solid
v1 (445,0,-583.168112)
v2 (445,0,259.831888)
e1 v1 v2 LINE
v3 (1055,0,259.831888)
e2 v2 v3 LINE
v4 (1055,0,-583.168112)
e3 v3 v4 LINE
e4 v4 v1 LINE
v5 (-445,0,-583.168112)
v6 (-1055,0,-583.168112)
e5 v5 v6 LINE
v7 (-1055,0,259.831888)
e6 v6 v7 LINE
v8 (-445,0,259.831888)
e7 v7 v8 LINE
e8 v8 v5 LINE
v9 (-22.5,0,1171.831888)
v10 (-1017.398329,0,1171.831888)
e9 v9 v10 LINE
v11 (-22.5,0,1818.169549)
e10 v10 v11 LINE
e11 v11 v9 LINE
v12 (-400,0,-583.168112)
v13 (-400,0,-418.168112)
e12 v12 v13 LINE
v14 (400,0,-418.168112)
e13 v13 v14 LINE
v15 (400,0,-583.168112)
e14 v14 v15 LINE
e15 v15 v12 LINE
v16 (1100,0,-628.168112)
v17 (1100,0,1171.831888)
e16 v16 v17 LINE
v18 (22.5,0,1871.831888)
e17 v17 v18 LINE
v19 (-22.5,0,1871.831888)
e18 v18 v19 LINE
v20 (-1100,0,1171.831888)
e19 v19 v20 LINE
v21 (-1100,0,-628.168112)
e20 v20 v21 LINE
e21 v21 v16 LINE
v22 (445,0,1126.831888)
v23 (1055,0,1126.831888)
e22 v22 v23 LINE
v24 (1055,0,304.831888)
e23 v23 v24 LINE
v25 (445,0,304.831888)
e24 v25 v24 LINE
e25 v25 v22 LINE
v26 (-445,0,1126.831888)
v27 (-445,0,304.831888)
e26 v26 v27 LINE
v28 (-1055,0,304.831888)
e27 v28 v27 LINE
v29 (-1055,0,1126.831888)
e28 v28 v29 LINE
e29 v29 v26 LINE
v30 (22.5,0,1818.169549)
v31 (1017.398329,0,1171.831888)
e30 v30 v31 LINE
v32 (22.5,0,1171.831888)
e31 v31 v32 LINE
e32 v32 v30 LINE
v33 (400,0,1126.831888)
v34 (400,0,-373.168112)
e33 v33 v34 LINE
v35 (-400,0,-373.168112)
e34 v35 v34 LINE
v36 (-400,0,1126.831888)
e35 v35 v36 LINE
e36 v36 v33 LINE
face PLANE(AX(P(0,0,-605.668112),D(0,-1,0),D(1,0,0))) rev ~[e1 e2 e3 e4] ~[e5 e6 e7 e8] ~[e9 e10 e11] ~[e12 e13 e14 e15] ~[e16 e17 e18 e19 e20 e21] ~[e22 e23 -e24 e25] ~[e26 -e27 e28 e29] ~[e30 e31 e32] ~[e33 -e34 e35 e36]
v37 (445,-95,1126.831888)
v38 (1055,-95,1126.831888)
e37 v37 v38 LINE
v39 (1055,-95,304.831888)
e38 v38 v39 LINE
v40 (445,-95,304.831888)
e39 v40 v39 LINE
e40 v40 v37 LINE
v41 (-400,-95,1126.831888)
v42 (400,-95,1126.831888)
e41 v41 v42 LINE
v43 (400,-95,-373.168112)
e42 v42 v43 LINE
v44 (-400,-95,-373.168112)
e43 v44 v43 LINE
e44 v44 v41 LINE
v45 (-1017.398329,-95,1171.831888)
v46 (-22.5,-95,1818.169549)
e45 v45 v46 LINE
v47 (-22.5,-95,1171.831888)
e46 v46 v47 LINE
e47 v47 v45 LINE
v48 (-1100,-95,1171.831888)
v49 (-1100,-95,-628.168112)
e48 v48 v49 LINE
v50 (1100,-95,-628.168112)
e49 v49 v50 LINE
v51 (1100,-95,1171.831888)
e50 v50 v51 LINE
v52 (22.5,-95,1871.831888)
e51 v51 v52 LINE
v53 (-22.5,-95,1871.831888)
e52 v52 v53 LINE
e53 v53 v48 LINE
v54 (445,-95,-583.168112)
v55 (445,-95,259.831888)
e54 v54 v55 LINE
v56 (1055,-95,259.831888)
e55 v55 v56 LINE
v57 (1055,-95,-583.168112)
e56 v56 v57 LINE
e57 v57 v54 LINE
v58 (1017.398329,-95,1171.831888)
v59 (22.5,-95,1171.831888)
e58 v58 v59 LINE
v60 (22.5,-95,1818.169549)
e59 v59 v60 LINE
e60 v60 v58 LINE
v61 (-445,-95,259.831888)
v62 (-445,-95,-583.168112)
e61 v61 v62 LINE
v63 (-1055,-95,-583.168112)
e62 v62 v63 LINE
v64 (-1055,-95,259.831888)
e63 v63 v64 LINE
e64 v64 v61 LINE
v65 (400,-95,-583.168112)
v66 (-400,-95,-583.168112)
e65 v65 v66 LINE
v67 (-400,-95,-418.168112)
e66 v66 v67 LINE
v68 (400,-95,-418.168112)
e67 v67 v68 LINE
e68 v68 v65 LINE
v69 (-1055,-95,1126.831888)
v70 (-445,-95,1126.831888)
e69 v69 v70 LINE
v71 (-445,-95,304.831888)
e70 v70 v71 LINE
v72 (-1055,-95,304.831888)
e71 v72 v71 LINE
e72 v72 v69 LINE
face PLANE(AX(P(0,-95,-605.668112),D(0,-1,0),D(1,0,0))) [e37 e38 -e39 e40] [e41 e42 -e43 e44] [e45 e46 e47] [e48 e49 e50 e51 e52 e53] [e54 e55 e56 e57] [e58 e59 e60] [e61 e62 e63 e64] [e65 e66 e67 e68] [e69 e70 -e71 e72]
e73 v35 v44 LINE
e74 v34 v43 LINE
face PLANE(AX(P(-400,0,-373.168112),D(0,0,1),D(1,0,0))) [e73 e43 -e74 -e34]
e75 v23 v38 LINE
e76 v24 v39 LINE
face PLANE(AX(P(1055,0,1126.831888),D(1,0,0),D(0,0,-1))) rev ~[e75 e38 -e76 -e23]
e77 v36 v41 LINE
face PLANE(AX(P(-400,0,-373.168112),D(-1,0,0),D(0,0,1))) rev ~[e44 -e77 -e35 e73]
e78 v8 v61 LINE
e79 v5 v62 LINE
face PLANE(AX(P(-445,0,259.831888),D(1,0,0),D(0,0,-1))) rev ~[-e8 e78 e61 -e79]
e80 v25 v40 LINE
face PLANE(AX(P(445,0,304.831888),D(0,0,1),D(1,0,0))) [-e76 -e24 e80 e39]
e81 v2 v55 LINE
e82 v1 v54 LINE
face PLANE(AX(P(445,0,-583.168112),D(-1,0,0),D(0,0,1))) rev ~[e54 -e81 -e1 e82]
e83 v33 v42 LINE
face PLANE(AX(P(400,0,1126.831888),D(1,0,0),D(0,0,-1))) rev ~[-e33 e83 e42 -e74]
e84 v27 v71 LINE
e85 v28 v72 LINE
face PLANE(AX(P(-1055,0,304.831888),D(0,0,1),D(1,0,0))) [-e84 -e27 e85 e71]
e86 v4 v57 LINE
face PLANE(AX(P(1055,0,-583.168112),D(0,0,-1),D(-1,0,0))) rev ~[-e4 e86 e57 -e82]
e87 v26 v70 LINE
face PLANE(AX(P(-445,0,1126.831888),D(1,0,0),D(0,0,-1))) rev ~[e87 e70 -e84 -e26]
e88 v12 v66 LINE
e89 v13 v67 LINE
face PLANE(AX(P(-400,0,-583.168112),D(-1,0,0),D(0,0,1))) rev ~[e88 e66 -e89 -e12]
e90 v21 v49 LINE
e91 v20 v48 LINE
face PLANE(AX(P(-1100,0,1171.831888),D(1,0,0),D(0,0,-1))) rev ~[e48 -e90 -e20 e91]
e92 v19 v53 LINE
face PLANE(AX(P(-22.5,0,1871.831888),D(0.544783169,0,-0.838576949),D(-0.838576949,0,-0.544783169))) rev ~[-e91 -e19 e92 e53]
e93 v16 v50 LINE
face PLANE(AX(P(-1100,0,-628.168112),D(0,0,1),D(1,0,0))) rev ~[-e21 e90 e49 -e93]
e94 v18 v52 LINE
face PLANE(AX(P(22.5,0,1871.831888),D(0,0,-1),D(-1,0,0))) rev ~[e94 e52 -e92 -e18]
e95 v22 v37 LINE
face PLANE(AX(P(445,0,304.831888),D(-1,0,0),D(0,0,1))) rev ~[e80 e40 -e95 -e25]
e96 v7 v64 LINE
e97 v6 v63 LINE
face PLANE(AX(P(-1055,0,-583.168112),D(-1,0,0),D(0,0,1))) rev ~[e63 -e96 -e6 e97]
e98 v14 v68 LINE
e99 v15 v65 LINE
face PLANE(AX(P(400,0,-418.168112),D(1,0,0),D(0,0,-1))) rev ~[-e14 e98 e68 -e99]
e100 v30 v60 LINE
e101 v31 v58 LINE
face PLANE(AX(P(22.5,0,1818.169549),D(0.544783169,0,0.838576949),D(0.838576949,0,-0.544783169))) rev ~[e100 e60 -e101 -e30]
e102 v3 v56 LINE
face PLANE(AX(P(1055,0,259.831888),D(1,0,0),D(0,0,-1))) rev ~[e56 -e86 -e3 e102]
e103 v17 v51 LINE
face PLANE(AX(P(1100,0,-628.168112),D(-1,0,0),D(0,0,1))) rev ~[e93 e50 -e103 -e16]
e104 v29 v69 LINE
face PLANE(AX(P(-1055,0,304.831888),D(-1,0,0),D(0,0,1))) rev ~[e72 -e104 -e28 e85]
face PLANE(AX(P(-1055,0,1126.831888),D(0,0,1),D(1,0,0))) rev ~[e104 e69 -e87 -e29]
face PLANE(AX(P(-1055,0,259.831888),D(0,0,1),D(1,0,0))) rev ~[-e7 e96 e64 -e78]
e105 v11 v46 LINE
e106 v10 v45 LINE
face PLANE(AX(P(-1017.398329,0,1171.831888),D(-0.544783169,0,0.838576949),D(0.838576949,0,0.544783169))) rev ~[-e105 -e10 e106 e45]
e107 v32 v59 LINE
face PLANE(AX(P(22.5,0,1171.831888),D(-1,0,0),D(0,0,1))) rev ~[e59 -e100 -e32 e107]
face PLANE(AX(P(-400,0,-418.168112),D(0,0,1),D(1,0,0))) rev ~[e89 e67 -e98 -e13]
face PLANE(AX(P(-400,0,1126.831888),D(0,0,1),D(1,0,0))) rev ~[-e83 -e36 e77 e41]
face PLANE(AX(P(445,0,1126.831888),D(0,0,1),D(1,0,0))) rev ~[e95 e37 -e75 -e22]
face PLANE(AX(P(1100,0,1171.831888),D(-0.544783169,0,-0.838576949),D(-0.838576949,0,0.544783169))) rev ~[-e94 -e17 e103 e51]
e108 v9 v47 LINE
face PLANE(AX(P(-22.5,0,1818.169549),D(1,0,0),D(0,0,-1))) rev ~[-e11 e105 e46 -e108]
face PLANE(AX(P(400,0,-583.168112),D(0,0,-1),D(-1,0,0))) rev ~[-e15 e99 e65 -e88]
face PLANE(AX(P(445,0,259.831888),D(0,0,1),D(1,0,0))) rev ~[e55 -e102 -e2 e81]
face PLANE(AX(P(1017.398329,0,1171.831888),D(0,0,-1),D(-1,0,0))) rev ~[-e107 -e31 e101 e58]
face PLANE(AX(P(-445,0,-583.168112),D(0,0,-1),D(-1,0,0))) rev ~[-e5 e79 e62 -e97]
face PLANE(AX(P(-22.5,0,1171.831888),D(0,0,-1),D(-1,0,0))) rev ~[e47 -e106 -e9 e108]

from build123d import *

# Parameters (mm, degrees)
F0_W     = 610
F0_H     = 45
F0_W_2   = 800
F1_DEPTH = 95


# Not quite as in the source:
# - a feature names something its author has since deleted; it is built from what else it names


with BuildPart() as f1:
    # F0 (on Front) → F1 (new body)
    with BuildSketch(Plane.XZ):
        Polygon((1100, -628.1681121112), (1100, -583.1681121112), (1055, -583.1681121112), (445, -583.1681121112), (400, -583.1681121112), (-400, -583.1681121112), (-445, -583.1681121112), (-1055, -583.1681121112), (-1100, -583.1681121112), (-1100, -628.1681121112), align=None)
        Polygon((1055, -583.1681121112), (1100, -583.1681121112), (1100, 1126.8318878888), (1055, 1126.8318878888), (1055, 304.8318878888), (1055, 259.8318878888), align=None)
        Polygon((1055, 1126.8318878888), (1100, 1126.8318878888), (1100, 1171.8318878888), (1017.398329114, 1171.8318878888), (22.5, 1171.8318878888), (-22.5, 1171.8318878888), (-1017.398329114, 1171.8318878888), (-1100, 1171.8318878888), (-1100, 1126.8318878888), (-1055, 1126.8318878888), (-445, 1126.8318878888), (-400, 1126.8318878888), (400, 1126.8318878888), (445, 1126.8318878888), align=None)
        Polygon((1017.398329114, 1171.8318878888), (1100, 1171.8318878888), (22.5, 1871.8318878888), (22.5, 1818.1695494942), align=None)
        Polygon((-1100, 1126.8318878888), (-1100, -583.1681121112), (-1055, -583.1681121112), (-1055, 259.8318878888), (-1055, 304.8318878888), (-1055, 1126.8318878888), align=None)
        Polygon((22.5, 1818.1695494942), (22.5, 1871.8318878888), (-22.5, 1871.8318878888), (-22.5, 1818.1695494942), (-22.5, 1171.8318878888), (22.5, 1171.8318878888), align=None)
        Polygon((-22.5, 1818.1695494942), (-22.5, 1871.8318878888), (-1100, 1171.8318878888), (-1017.398329114, 1171.8318878888), align=None)
        Polygon((-445, -583.1681121112), (-400, -583.1681121112), (-400, -418.1681121112), (-400, -373.1681121112), (-400, 1126.8318878888), (-445, 1126.8318878888), (-445, 304.8318878888), (-445, 259.8318878888), align=None)
        Polygon((400, -583.1681121112), (445, -583.1681121112), (445, 259.8318878888), (445, 304.8318878888), (445, 1126.8318878888), (400, 1126.8318878888), (400, -373.1681121112), (400, -418.1681121112), align=None)
        with Locations((750, 282.3318878888)):
            Rectangle(F0_W, F0_H)
        with Locations((-750, 282.3318878888)):
            Rectangle(F0_W, F0_H)
        with Locations((0, -395.6681121112)):
            Rectangle(F0_W_2, F0_H)
    extrude(amount=F1_DEPTH)


solid = f1.part
